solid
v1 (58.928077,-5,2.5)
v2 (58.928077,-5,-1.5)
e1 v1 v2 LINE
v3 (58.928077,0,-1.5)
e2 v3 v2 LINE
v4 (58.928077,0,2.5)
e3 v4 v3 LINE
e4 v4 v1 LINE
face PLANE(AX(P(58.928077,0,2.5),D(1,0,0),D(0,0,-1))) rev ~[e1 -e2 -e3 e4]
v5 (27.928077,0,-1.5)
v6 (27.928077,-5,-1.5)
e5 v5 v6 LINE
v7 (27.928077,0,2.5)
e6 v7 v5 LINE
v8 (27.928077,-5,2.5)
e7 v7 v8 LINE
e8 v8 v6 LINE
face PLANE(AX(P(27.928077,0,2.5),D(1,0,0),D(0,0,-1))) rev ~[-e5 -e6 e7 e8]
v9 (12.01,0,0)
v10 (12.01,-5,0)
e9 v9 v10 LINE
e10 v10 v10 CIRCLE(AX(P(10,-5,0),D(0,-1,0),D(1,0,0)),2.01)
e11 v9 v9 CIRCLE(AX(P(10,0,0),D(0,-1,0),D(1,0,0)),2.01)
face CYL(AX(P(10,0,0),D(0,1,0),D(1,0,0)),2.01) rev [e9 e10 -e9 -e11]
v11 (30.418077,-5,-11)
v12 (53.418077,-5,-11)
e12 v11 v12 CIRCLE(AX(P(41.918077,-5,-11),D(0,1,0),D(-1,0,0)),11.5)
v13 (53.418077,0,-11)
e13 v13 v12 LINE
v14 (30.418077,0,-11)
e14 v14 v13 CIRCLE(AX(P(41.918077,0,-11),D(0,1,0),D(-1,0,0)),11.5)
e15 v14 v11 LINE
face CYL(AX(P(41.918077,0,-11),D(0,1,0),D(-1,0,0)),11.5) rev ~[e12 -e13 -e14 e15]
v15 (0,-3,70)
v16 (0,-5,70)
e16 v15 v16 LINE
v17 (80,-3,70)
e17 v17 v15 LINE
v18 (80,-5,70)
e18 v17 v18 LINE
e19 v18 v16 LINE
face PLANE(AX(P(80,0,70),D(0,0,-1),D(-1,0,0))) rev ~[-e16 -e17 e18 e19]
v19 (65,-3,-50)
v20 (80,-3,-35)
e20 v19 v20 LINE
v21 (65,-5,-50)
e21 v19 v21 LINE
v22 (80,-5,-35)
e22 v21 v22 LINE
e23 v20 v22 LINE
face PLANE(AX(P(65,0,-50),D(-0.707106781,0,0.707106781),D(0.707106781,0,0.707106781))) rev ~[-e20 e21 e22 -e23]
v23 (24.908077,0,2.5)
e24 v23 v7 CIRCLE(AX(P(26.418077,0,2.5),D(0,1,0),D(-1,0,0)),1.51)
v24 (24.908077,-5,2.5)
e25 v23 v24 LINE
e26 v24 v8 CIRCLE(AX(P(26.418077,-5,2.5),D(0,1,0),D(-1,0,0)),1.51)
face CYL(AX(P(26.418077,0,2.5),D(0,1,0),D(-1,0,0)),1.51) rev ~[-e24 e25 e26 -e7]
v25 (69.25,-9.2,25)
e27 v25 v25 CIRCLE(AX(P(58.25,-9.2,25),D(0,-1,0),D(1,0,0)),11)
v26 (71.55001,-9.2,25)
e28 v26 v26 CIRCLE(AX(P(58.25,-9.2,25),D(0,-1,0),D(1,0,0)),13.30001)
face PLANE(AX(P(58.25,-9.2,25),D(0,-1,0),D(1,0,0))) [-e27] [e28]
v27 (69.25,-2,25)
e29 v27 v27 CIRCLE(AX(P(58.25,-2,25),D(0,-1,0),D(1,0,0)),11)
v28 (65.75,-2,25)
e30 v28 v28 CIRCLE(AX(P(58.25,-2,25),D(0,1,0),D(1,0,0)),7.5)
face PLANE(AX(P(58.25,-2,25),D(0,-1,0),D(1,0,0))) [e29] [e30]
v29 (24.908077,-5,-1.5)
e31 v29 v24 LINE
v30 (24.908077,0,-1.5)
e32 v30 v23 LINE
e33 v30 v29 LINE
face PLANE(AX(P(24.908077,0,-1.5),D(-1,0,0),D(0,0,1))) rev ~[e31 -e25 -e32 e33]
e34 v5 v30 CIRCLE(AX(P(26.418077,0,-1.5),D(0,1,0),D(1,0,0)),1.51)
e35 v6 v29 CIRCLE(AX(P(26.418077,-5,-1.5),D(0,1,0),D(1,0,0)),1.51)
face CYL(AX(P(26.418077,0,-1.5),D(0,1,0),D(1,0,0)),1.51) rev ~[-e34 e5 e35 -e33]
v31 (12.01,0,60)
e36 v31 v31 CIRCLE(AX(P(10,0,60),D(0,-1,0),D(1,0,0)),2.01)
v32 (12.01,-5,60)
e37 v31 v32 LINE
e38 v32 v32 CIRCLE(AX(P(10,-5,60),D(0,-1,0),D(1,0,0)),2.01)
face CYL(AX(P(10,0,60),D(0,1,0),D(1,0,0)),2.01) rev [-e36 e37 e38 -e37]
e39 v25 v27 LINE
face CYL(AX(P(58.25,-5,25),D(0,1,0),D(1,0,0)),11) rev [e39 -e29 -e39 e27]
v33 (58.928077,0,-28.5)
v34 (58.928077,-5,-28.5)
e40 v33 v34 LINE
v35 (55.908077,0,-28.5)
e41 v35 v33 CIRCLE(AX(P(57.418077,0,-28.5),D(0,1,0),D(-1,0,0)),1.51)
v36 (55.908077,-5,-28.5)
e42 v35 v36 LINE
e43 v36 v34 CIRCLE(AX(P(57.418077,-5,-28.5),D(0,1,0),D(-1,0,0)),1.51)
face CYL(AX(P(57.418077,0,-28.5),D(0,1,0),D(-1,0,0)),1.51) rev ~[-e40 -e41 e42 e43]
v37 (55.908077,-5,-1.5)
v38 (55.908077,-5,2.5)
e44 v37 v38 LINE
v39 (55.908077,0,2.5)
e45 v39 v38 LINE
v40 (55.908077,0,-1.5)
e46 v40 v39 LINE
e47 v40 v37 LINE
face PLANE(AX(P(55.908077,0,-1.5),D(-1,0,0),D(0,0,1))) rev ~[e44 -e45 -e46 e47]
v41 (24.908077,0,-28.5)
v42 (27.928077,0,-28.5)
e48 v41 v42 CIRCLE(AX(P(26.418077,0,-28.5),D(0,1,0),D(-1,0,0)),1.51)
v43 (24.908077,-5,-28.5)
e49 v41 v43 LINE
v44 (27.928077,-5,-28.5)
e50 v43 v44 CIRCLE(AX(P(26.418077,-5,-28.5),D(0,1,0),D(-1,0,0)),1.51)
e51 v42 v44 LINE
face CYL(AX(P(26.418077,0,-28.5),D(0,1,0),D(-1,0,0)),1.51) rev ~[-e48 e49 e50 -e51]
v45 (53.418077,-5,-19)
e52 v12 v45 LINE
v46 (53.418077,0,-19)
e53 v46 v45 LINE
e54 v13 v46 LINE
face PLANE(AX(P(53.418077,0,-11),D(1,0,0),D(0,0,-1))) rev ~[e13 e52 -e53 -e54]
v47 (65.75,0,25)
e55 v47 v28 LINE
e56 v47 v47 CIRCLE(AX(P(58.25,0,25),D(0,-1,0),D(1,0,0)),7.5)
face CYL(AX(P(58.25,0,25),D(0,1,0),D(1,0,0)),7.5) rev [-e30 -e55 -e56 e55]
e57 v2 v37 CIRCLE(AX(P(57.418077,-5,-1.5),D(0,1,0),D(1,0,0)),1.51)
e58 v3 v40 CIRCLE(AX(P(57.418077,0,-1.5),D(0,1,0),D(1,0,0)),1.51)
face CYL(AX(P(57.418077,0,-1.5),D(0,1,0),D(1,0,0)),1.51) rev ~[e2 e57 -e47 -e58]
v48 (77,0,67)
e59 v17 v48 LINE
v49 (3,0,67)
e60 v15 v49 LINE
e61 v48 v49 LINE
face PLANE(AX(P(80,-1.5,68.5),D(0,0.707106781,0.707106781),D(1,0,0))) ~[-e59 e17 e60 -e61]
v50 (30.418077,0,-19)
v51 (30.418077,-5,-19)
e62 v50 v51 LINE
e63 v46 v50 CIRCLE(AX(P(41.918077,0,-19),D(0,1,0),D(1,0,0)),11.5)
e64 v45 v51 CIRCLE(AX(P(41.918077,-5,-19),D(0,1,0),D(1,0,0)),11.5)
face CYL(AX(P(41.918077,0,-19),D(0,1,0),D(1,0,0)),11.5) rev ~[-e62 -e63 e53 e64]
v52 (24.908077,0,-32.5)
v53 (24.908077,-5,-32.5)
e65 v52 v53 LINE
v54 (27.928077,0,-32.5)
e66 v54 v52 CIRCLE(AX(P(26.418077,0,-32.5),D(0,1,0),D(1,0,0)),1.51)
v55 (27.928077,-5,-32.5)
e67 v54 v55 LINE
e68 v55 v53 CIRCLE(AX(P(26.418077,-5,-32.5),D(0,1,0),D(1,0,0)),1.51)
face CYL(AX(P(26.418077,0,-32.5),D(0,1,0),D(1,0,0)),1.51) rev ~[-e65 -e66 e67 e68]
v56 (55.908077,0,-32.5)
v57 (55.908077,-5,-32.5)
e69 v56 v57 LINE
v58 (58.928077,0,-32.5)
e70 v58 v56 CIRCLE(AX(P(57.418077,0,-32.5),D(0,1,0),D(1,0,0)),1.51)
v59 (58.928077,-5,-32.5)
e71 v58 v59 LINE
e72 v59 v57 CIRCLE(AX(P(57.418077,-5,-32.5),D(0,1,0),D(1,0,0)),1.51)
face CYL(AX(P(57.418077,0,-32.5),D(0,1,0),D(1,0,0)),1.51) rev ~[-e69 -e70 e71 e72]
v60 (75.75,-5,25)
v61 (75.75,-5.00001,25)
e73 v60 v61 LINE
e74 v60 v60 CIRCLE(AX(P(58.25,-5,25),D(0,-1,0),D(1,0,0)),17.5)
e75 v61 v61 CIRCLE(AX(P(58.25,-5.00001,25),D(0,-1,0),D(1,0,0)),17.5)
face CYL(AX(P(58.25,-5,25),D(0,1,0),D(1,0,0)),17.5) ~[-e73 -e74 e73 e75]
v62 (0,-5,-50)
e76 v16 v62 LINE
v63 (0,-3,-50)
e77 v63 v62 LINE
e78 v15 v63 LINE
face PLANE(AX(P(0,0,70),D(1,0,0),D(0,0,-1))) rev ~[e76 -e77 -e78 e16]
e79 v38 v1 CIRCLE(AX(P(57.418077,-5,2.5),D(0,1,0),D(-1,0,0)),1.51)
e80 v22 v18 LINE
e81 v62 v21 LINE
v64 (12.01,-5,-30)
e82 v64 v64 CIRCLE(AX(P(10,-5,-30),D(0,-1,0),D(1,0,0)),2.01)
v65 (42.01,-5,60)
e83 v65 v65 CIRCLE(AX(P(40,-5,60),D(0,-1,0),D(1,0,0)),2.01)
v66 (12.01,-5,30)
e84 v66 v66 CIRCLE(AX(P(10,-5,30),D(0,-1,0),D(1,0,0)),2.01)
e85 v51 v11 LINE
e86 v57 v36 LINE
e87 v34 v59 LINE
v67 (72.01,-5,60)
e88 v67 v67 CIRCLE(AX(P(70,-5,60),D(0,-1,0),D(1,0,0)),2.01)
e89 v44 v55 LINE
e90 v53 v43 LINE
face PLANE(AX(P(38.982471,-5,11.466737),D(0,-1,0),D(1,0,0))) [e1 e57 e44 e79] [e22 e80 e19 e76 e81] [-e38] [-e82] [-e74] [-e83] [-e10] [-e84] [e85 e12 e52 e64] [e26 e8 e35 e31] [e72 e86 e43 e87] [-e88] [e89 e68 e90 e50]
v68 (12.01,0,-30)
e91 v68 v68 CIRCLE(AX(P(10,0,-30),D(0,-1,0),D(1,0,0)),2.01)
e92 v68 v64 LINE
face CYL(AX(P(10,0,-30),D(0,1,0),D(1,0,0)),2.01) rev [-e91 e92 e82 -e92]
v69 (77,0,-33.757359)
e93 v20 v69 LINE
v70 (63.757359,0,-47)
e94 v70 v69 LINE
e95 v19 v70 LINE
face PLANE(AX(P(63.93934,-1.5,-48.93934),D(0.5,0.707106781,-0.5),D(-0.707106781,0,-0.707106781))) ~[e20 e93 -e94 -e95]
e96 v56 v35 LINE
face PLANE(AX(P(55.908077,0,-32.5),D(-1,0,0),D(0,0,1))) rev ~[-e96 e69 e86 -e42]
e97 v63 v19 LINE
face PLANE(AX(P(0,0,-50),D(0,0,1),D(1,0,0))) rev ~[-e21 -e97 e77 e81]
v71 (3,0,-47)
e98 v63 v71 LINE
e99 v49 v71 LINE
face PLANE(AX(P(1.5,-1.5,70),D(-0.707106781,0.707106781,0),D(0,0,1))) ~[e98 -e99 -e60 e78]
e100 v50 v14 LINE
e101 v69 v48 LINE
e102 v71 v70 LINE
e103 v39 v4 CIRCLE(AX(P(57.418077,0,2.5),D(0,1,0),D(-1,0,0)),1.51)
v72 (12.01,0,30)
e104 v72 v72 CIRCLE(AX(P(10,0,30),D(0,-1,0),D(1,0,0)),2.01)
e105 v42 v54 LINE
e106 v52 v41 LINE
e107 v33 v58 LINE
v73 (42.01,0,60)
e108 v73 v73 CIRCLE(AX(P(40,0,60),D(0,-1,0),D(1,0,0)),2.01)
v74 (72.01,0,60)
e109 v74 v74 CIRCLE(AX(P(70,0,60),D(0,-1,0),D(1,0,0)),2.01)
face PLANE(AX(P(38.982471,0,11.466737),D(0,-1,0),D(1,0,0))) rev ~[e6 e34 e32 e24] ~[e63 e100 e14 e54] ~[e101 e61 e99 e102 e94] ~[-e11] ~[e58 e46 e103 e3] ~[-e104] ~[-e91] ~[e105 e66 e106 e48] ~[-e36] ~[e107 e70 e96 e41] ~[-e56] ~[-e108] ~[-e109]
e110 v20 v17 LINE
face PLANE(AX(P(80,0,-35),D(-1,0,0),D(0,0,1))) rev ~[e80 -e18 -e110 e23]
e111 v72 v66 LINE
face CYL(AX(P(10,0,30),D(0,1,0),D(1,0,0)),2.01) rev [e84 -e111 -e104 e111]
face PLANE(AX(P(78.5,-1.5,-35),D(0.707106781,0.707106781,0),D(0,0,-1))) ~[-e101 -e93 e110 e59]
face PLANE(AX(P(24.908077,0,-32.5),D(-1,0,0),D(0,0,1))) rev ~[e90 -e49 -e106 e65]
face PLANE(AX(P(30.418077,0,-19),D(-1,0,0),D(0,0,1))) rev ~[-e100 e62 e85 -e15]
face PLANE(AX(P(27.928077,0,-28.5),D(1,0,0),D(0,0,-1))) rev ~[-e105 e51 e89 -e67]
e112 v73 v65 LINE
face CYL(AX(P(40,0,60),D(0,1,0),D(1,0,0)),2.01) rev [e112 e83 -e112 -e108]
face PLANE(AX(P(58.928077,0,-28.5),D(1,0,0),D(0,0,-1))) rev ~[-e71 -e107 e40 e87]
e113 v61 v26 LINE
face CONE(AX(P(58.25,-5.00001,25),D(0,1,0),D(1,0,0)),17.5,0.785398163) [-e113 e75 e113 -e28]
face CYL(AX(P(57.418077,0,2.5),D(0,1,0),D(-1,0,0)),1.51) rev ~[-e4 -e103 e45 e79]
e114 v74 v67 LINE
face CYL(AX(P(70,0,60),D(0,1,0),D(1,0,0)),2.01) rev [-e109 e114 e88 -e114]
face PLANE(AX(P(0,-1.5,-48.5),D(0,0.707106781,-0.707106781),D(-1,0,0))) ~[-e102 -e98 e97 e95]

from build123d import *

# Parameters (mm, degrees)
F0_R     = 2.01
F0_R_2   = 7.5
F1_DEPTH = 5
F2_SIZE  = 3
F3_R     = 11
F4_DEPTH = 3
F5_R     = 17.5
F5_R_2   = 11
F6_DEPTH = 4.2
F7_SIZE  = 4.19999


# Not quite as in the source:
# - a fillet or chamfer is up to 0.001 mm smaller than in the source, because OpenCascade refuses the exact size


with BuildPart() as f1:
    # F0 (on Front) → F1 (new body)
    with BuildSketch(Plane.XZ):
        Polygon((0, 70), (0, 0), (0, -50), (65, -50), (80, -35), (80, 70), align=None)
        with Locations((10, -30)):
            Circle(F0_R, mode=Mode.SUBTRACT)
        with BuildLine():
            ThreePointArc((24.9080765748, -28.5), (26.4180765748, -26.99), (27.9280765748, -28.5))
            Line((27.9280765748, -28.5), (27.9280765748, -32.5))
            ThreePointArc((27.9280765748, -32.5), (26.4180765748, -34.01), (24.9080765748, -32.5))
            Line((24.9080765748, -32.5), (24.9080765748, -28.5))
        make_face(mode=Mode.SUBTRACT)
        with Locations((10, 0)):
            Circle(F0_R, mode=Mode.SUBTRACT)
        with BuildLine():
            ThreePointArc((27.9280765748, -1.5), (26.4180765748, -3.01), (24.9080765748, -1.5))
            Line((24.9080765748, -1.5), (24.9080765748, 2.5))
            ThreePointArc((24.9080765748, 2.5), (26.4180765748, 4.01), (27.9280765748, 2.5))
            Line((27.9280765748, 2.5), (27.9280765748, -1.5))
        make_face(mode=Mode.SUBTRACT)
        with BuildLine():
            ThreePointArc((55.9080765748, -28.5), (57.4180765748, -26.99), (58.9280765748, -28.5))
            Line((58.9280765748, -28.5), (58.9280765748, -32.5))
            ThreePointArc((58.9280765748, -32.5), (57.4180765748, -34.01), (55.9080765748, -32.5))
            Line((55.9080765748, -32.5), (55.9080765748, -28.5))
        make_face(mode=Mode.SUBTRACT)
        with BuildLine():
            ThreePointArc((30.4180765748, -11), (41.9180765748, 0.5), (53.4180765748, -11))
            Line((53.4180765748, -11), (53.4180765748, -19))
            ThreePointArc((53.4180765748, -19), (41.9180765748, -30.5), (30.4180765748, -19))
            Line((30.4180765748, -19), (30.4180765748, -11))
        make_face(mode=Mode.SUBTRACT)
        with BuildLine():
            ThreePointArc((58.9280765748, -1.5), (57.4180765748, -3.01), (55.9080765748, -1.5))
            Line((55.9080765748, -1.5), (55.9080765748, 2.5))
            ThreePointArc((55.9080765748, 2.5), (57.4180765748, 4.01), (58.9280765748, 2.5))
            Line((58.9280765748, 2.5), (58.9280765748, -1.5))
        make_face(mode=Mode.SUBTRACT)
        with Locations((10, 30)):
            Circle(F0_R, mode=Mode.SUBTRACT)
        with Locations((10, 60)):
            Circle(F0_R, mode=Mode.SUBTRACT)
        with Locations((58.25, 25)):
            Circle(F0_R_2, mode=Mode.SUBTRACT)
        with Locations((40, 60)):
            Circle(F0_R, mode=Mode.SUBTRACT)
        with Locations((70, 60)):
            Circle(F0_R, mode=Mode.SUBTRACT)
    extrude(amount=F1_DEPTH)

    # F2
    f2_edges = [f1.edges().sort_by_distance(p)[0] for p in [
        (80, 0, 17.5),
        (40, 0, 70),
        (0, 0, 10),
        (32.5, 0, -50),
        (72.5, 0, -42.5),
    ]]
    chamfer(f2_edges, length=F2_SIZE)

    # F3 (on face) → F4 (cut)
    with BuildSketch(Plane.XZ.offset(5)):
        with Locations((58.25, 25)):
            Circle(F3_R)
    extrude(amount=-F4_DEPTH, mode=Mode.SUBTRACT)

    # F5 (on face) → F6 (join)
    with BuildSketch(Plane.XZ.offset(5)):
        with Locations((58.25, 25)):
            Circle(F5_R)
        with Locations((58.25, 25)):
            Circle(F5_R_2, mode=Mode.SUBTRACT)
    extrude(amount=F6_DEPTH)

    # F7 (size 4.2 in the source; OpenCascade refuses exactly that, so slightly less here)
    f7_edges = [f1.edges().sort_by_distance(p)[0] for p in [
        (40.75, -9.2, 25),
    ]]
    chamfer(f7_edges, length=F7_SIZE)


solid = f1.part
